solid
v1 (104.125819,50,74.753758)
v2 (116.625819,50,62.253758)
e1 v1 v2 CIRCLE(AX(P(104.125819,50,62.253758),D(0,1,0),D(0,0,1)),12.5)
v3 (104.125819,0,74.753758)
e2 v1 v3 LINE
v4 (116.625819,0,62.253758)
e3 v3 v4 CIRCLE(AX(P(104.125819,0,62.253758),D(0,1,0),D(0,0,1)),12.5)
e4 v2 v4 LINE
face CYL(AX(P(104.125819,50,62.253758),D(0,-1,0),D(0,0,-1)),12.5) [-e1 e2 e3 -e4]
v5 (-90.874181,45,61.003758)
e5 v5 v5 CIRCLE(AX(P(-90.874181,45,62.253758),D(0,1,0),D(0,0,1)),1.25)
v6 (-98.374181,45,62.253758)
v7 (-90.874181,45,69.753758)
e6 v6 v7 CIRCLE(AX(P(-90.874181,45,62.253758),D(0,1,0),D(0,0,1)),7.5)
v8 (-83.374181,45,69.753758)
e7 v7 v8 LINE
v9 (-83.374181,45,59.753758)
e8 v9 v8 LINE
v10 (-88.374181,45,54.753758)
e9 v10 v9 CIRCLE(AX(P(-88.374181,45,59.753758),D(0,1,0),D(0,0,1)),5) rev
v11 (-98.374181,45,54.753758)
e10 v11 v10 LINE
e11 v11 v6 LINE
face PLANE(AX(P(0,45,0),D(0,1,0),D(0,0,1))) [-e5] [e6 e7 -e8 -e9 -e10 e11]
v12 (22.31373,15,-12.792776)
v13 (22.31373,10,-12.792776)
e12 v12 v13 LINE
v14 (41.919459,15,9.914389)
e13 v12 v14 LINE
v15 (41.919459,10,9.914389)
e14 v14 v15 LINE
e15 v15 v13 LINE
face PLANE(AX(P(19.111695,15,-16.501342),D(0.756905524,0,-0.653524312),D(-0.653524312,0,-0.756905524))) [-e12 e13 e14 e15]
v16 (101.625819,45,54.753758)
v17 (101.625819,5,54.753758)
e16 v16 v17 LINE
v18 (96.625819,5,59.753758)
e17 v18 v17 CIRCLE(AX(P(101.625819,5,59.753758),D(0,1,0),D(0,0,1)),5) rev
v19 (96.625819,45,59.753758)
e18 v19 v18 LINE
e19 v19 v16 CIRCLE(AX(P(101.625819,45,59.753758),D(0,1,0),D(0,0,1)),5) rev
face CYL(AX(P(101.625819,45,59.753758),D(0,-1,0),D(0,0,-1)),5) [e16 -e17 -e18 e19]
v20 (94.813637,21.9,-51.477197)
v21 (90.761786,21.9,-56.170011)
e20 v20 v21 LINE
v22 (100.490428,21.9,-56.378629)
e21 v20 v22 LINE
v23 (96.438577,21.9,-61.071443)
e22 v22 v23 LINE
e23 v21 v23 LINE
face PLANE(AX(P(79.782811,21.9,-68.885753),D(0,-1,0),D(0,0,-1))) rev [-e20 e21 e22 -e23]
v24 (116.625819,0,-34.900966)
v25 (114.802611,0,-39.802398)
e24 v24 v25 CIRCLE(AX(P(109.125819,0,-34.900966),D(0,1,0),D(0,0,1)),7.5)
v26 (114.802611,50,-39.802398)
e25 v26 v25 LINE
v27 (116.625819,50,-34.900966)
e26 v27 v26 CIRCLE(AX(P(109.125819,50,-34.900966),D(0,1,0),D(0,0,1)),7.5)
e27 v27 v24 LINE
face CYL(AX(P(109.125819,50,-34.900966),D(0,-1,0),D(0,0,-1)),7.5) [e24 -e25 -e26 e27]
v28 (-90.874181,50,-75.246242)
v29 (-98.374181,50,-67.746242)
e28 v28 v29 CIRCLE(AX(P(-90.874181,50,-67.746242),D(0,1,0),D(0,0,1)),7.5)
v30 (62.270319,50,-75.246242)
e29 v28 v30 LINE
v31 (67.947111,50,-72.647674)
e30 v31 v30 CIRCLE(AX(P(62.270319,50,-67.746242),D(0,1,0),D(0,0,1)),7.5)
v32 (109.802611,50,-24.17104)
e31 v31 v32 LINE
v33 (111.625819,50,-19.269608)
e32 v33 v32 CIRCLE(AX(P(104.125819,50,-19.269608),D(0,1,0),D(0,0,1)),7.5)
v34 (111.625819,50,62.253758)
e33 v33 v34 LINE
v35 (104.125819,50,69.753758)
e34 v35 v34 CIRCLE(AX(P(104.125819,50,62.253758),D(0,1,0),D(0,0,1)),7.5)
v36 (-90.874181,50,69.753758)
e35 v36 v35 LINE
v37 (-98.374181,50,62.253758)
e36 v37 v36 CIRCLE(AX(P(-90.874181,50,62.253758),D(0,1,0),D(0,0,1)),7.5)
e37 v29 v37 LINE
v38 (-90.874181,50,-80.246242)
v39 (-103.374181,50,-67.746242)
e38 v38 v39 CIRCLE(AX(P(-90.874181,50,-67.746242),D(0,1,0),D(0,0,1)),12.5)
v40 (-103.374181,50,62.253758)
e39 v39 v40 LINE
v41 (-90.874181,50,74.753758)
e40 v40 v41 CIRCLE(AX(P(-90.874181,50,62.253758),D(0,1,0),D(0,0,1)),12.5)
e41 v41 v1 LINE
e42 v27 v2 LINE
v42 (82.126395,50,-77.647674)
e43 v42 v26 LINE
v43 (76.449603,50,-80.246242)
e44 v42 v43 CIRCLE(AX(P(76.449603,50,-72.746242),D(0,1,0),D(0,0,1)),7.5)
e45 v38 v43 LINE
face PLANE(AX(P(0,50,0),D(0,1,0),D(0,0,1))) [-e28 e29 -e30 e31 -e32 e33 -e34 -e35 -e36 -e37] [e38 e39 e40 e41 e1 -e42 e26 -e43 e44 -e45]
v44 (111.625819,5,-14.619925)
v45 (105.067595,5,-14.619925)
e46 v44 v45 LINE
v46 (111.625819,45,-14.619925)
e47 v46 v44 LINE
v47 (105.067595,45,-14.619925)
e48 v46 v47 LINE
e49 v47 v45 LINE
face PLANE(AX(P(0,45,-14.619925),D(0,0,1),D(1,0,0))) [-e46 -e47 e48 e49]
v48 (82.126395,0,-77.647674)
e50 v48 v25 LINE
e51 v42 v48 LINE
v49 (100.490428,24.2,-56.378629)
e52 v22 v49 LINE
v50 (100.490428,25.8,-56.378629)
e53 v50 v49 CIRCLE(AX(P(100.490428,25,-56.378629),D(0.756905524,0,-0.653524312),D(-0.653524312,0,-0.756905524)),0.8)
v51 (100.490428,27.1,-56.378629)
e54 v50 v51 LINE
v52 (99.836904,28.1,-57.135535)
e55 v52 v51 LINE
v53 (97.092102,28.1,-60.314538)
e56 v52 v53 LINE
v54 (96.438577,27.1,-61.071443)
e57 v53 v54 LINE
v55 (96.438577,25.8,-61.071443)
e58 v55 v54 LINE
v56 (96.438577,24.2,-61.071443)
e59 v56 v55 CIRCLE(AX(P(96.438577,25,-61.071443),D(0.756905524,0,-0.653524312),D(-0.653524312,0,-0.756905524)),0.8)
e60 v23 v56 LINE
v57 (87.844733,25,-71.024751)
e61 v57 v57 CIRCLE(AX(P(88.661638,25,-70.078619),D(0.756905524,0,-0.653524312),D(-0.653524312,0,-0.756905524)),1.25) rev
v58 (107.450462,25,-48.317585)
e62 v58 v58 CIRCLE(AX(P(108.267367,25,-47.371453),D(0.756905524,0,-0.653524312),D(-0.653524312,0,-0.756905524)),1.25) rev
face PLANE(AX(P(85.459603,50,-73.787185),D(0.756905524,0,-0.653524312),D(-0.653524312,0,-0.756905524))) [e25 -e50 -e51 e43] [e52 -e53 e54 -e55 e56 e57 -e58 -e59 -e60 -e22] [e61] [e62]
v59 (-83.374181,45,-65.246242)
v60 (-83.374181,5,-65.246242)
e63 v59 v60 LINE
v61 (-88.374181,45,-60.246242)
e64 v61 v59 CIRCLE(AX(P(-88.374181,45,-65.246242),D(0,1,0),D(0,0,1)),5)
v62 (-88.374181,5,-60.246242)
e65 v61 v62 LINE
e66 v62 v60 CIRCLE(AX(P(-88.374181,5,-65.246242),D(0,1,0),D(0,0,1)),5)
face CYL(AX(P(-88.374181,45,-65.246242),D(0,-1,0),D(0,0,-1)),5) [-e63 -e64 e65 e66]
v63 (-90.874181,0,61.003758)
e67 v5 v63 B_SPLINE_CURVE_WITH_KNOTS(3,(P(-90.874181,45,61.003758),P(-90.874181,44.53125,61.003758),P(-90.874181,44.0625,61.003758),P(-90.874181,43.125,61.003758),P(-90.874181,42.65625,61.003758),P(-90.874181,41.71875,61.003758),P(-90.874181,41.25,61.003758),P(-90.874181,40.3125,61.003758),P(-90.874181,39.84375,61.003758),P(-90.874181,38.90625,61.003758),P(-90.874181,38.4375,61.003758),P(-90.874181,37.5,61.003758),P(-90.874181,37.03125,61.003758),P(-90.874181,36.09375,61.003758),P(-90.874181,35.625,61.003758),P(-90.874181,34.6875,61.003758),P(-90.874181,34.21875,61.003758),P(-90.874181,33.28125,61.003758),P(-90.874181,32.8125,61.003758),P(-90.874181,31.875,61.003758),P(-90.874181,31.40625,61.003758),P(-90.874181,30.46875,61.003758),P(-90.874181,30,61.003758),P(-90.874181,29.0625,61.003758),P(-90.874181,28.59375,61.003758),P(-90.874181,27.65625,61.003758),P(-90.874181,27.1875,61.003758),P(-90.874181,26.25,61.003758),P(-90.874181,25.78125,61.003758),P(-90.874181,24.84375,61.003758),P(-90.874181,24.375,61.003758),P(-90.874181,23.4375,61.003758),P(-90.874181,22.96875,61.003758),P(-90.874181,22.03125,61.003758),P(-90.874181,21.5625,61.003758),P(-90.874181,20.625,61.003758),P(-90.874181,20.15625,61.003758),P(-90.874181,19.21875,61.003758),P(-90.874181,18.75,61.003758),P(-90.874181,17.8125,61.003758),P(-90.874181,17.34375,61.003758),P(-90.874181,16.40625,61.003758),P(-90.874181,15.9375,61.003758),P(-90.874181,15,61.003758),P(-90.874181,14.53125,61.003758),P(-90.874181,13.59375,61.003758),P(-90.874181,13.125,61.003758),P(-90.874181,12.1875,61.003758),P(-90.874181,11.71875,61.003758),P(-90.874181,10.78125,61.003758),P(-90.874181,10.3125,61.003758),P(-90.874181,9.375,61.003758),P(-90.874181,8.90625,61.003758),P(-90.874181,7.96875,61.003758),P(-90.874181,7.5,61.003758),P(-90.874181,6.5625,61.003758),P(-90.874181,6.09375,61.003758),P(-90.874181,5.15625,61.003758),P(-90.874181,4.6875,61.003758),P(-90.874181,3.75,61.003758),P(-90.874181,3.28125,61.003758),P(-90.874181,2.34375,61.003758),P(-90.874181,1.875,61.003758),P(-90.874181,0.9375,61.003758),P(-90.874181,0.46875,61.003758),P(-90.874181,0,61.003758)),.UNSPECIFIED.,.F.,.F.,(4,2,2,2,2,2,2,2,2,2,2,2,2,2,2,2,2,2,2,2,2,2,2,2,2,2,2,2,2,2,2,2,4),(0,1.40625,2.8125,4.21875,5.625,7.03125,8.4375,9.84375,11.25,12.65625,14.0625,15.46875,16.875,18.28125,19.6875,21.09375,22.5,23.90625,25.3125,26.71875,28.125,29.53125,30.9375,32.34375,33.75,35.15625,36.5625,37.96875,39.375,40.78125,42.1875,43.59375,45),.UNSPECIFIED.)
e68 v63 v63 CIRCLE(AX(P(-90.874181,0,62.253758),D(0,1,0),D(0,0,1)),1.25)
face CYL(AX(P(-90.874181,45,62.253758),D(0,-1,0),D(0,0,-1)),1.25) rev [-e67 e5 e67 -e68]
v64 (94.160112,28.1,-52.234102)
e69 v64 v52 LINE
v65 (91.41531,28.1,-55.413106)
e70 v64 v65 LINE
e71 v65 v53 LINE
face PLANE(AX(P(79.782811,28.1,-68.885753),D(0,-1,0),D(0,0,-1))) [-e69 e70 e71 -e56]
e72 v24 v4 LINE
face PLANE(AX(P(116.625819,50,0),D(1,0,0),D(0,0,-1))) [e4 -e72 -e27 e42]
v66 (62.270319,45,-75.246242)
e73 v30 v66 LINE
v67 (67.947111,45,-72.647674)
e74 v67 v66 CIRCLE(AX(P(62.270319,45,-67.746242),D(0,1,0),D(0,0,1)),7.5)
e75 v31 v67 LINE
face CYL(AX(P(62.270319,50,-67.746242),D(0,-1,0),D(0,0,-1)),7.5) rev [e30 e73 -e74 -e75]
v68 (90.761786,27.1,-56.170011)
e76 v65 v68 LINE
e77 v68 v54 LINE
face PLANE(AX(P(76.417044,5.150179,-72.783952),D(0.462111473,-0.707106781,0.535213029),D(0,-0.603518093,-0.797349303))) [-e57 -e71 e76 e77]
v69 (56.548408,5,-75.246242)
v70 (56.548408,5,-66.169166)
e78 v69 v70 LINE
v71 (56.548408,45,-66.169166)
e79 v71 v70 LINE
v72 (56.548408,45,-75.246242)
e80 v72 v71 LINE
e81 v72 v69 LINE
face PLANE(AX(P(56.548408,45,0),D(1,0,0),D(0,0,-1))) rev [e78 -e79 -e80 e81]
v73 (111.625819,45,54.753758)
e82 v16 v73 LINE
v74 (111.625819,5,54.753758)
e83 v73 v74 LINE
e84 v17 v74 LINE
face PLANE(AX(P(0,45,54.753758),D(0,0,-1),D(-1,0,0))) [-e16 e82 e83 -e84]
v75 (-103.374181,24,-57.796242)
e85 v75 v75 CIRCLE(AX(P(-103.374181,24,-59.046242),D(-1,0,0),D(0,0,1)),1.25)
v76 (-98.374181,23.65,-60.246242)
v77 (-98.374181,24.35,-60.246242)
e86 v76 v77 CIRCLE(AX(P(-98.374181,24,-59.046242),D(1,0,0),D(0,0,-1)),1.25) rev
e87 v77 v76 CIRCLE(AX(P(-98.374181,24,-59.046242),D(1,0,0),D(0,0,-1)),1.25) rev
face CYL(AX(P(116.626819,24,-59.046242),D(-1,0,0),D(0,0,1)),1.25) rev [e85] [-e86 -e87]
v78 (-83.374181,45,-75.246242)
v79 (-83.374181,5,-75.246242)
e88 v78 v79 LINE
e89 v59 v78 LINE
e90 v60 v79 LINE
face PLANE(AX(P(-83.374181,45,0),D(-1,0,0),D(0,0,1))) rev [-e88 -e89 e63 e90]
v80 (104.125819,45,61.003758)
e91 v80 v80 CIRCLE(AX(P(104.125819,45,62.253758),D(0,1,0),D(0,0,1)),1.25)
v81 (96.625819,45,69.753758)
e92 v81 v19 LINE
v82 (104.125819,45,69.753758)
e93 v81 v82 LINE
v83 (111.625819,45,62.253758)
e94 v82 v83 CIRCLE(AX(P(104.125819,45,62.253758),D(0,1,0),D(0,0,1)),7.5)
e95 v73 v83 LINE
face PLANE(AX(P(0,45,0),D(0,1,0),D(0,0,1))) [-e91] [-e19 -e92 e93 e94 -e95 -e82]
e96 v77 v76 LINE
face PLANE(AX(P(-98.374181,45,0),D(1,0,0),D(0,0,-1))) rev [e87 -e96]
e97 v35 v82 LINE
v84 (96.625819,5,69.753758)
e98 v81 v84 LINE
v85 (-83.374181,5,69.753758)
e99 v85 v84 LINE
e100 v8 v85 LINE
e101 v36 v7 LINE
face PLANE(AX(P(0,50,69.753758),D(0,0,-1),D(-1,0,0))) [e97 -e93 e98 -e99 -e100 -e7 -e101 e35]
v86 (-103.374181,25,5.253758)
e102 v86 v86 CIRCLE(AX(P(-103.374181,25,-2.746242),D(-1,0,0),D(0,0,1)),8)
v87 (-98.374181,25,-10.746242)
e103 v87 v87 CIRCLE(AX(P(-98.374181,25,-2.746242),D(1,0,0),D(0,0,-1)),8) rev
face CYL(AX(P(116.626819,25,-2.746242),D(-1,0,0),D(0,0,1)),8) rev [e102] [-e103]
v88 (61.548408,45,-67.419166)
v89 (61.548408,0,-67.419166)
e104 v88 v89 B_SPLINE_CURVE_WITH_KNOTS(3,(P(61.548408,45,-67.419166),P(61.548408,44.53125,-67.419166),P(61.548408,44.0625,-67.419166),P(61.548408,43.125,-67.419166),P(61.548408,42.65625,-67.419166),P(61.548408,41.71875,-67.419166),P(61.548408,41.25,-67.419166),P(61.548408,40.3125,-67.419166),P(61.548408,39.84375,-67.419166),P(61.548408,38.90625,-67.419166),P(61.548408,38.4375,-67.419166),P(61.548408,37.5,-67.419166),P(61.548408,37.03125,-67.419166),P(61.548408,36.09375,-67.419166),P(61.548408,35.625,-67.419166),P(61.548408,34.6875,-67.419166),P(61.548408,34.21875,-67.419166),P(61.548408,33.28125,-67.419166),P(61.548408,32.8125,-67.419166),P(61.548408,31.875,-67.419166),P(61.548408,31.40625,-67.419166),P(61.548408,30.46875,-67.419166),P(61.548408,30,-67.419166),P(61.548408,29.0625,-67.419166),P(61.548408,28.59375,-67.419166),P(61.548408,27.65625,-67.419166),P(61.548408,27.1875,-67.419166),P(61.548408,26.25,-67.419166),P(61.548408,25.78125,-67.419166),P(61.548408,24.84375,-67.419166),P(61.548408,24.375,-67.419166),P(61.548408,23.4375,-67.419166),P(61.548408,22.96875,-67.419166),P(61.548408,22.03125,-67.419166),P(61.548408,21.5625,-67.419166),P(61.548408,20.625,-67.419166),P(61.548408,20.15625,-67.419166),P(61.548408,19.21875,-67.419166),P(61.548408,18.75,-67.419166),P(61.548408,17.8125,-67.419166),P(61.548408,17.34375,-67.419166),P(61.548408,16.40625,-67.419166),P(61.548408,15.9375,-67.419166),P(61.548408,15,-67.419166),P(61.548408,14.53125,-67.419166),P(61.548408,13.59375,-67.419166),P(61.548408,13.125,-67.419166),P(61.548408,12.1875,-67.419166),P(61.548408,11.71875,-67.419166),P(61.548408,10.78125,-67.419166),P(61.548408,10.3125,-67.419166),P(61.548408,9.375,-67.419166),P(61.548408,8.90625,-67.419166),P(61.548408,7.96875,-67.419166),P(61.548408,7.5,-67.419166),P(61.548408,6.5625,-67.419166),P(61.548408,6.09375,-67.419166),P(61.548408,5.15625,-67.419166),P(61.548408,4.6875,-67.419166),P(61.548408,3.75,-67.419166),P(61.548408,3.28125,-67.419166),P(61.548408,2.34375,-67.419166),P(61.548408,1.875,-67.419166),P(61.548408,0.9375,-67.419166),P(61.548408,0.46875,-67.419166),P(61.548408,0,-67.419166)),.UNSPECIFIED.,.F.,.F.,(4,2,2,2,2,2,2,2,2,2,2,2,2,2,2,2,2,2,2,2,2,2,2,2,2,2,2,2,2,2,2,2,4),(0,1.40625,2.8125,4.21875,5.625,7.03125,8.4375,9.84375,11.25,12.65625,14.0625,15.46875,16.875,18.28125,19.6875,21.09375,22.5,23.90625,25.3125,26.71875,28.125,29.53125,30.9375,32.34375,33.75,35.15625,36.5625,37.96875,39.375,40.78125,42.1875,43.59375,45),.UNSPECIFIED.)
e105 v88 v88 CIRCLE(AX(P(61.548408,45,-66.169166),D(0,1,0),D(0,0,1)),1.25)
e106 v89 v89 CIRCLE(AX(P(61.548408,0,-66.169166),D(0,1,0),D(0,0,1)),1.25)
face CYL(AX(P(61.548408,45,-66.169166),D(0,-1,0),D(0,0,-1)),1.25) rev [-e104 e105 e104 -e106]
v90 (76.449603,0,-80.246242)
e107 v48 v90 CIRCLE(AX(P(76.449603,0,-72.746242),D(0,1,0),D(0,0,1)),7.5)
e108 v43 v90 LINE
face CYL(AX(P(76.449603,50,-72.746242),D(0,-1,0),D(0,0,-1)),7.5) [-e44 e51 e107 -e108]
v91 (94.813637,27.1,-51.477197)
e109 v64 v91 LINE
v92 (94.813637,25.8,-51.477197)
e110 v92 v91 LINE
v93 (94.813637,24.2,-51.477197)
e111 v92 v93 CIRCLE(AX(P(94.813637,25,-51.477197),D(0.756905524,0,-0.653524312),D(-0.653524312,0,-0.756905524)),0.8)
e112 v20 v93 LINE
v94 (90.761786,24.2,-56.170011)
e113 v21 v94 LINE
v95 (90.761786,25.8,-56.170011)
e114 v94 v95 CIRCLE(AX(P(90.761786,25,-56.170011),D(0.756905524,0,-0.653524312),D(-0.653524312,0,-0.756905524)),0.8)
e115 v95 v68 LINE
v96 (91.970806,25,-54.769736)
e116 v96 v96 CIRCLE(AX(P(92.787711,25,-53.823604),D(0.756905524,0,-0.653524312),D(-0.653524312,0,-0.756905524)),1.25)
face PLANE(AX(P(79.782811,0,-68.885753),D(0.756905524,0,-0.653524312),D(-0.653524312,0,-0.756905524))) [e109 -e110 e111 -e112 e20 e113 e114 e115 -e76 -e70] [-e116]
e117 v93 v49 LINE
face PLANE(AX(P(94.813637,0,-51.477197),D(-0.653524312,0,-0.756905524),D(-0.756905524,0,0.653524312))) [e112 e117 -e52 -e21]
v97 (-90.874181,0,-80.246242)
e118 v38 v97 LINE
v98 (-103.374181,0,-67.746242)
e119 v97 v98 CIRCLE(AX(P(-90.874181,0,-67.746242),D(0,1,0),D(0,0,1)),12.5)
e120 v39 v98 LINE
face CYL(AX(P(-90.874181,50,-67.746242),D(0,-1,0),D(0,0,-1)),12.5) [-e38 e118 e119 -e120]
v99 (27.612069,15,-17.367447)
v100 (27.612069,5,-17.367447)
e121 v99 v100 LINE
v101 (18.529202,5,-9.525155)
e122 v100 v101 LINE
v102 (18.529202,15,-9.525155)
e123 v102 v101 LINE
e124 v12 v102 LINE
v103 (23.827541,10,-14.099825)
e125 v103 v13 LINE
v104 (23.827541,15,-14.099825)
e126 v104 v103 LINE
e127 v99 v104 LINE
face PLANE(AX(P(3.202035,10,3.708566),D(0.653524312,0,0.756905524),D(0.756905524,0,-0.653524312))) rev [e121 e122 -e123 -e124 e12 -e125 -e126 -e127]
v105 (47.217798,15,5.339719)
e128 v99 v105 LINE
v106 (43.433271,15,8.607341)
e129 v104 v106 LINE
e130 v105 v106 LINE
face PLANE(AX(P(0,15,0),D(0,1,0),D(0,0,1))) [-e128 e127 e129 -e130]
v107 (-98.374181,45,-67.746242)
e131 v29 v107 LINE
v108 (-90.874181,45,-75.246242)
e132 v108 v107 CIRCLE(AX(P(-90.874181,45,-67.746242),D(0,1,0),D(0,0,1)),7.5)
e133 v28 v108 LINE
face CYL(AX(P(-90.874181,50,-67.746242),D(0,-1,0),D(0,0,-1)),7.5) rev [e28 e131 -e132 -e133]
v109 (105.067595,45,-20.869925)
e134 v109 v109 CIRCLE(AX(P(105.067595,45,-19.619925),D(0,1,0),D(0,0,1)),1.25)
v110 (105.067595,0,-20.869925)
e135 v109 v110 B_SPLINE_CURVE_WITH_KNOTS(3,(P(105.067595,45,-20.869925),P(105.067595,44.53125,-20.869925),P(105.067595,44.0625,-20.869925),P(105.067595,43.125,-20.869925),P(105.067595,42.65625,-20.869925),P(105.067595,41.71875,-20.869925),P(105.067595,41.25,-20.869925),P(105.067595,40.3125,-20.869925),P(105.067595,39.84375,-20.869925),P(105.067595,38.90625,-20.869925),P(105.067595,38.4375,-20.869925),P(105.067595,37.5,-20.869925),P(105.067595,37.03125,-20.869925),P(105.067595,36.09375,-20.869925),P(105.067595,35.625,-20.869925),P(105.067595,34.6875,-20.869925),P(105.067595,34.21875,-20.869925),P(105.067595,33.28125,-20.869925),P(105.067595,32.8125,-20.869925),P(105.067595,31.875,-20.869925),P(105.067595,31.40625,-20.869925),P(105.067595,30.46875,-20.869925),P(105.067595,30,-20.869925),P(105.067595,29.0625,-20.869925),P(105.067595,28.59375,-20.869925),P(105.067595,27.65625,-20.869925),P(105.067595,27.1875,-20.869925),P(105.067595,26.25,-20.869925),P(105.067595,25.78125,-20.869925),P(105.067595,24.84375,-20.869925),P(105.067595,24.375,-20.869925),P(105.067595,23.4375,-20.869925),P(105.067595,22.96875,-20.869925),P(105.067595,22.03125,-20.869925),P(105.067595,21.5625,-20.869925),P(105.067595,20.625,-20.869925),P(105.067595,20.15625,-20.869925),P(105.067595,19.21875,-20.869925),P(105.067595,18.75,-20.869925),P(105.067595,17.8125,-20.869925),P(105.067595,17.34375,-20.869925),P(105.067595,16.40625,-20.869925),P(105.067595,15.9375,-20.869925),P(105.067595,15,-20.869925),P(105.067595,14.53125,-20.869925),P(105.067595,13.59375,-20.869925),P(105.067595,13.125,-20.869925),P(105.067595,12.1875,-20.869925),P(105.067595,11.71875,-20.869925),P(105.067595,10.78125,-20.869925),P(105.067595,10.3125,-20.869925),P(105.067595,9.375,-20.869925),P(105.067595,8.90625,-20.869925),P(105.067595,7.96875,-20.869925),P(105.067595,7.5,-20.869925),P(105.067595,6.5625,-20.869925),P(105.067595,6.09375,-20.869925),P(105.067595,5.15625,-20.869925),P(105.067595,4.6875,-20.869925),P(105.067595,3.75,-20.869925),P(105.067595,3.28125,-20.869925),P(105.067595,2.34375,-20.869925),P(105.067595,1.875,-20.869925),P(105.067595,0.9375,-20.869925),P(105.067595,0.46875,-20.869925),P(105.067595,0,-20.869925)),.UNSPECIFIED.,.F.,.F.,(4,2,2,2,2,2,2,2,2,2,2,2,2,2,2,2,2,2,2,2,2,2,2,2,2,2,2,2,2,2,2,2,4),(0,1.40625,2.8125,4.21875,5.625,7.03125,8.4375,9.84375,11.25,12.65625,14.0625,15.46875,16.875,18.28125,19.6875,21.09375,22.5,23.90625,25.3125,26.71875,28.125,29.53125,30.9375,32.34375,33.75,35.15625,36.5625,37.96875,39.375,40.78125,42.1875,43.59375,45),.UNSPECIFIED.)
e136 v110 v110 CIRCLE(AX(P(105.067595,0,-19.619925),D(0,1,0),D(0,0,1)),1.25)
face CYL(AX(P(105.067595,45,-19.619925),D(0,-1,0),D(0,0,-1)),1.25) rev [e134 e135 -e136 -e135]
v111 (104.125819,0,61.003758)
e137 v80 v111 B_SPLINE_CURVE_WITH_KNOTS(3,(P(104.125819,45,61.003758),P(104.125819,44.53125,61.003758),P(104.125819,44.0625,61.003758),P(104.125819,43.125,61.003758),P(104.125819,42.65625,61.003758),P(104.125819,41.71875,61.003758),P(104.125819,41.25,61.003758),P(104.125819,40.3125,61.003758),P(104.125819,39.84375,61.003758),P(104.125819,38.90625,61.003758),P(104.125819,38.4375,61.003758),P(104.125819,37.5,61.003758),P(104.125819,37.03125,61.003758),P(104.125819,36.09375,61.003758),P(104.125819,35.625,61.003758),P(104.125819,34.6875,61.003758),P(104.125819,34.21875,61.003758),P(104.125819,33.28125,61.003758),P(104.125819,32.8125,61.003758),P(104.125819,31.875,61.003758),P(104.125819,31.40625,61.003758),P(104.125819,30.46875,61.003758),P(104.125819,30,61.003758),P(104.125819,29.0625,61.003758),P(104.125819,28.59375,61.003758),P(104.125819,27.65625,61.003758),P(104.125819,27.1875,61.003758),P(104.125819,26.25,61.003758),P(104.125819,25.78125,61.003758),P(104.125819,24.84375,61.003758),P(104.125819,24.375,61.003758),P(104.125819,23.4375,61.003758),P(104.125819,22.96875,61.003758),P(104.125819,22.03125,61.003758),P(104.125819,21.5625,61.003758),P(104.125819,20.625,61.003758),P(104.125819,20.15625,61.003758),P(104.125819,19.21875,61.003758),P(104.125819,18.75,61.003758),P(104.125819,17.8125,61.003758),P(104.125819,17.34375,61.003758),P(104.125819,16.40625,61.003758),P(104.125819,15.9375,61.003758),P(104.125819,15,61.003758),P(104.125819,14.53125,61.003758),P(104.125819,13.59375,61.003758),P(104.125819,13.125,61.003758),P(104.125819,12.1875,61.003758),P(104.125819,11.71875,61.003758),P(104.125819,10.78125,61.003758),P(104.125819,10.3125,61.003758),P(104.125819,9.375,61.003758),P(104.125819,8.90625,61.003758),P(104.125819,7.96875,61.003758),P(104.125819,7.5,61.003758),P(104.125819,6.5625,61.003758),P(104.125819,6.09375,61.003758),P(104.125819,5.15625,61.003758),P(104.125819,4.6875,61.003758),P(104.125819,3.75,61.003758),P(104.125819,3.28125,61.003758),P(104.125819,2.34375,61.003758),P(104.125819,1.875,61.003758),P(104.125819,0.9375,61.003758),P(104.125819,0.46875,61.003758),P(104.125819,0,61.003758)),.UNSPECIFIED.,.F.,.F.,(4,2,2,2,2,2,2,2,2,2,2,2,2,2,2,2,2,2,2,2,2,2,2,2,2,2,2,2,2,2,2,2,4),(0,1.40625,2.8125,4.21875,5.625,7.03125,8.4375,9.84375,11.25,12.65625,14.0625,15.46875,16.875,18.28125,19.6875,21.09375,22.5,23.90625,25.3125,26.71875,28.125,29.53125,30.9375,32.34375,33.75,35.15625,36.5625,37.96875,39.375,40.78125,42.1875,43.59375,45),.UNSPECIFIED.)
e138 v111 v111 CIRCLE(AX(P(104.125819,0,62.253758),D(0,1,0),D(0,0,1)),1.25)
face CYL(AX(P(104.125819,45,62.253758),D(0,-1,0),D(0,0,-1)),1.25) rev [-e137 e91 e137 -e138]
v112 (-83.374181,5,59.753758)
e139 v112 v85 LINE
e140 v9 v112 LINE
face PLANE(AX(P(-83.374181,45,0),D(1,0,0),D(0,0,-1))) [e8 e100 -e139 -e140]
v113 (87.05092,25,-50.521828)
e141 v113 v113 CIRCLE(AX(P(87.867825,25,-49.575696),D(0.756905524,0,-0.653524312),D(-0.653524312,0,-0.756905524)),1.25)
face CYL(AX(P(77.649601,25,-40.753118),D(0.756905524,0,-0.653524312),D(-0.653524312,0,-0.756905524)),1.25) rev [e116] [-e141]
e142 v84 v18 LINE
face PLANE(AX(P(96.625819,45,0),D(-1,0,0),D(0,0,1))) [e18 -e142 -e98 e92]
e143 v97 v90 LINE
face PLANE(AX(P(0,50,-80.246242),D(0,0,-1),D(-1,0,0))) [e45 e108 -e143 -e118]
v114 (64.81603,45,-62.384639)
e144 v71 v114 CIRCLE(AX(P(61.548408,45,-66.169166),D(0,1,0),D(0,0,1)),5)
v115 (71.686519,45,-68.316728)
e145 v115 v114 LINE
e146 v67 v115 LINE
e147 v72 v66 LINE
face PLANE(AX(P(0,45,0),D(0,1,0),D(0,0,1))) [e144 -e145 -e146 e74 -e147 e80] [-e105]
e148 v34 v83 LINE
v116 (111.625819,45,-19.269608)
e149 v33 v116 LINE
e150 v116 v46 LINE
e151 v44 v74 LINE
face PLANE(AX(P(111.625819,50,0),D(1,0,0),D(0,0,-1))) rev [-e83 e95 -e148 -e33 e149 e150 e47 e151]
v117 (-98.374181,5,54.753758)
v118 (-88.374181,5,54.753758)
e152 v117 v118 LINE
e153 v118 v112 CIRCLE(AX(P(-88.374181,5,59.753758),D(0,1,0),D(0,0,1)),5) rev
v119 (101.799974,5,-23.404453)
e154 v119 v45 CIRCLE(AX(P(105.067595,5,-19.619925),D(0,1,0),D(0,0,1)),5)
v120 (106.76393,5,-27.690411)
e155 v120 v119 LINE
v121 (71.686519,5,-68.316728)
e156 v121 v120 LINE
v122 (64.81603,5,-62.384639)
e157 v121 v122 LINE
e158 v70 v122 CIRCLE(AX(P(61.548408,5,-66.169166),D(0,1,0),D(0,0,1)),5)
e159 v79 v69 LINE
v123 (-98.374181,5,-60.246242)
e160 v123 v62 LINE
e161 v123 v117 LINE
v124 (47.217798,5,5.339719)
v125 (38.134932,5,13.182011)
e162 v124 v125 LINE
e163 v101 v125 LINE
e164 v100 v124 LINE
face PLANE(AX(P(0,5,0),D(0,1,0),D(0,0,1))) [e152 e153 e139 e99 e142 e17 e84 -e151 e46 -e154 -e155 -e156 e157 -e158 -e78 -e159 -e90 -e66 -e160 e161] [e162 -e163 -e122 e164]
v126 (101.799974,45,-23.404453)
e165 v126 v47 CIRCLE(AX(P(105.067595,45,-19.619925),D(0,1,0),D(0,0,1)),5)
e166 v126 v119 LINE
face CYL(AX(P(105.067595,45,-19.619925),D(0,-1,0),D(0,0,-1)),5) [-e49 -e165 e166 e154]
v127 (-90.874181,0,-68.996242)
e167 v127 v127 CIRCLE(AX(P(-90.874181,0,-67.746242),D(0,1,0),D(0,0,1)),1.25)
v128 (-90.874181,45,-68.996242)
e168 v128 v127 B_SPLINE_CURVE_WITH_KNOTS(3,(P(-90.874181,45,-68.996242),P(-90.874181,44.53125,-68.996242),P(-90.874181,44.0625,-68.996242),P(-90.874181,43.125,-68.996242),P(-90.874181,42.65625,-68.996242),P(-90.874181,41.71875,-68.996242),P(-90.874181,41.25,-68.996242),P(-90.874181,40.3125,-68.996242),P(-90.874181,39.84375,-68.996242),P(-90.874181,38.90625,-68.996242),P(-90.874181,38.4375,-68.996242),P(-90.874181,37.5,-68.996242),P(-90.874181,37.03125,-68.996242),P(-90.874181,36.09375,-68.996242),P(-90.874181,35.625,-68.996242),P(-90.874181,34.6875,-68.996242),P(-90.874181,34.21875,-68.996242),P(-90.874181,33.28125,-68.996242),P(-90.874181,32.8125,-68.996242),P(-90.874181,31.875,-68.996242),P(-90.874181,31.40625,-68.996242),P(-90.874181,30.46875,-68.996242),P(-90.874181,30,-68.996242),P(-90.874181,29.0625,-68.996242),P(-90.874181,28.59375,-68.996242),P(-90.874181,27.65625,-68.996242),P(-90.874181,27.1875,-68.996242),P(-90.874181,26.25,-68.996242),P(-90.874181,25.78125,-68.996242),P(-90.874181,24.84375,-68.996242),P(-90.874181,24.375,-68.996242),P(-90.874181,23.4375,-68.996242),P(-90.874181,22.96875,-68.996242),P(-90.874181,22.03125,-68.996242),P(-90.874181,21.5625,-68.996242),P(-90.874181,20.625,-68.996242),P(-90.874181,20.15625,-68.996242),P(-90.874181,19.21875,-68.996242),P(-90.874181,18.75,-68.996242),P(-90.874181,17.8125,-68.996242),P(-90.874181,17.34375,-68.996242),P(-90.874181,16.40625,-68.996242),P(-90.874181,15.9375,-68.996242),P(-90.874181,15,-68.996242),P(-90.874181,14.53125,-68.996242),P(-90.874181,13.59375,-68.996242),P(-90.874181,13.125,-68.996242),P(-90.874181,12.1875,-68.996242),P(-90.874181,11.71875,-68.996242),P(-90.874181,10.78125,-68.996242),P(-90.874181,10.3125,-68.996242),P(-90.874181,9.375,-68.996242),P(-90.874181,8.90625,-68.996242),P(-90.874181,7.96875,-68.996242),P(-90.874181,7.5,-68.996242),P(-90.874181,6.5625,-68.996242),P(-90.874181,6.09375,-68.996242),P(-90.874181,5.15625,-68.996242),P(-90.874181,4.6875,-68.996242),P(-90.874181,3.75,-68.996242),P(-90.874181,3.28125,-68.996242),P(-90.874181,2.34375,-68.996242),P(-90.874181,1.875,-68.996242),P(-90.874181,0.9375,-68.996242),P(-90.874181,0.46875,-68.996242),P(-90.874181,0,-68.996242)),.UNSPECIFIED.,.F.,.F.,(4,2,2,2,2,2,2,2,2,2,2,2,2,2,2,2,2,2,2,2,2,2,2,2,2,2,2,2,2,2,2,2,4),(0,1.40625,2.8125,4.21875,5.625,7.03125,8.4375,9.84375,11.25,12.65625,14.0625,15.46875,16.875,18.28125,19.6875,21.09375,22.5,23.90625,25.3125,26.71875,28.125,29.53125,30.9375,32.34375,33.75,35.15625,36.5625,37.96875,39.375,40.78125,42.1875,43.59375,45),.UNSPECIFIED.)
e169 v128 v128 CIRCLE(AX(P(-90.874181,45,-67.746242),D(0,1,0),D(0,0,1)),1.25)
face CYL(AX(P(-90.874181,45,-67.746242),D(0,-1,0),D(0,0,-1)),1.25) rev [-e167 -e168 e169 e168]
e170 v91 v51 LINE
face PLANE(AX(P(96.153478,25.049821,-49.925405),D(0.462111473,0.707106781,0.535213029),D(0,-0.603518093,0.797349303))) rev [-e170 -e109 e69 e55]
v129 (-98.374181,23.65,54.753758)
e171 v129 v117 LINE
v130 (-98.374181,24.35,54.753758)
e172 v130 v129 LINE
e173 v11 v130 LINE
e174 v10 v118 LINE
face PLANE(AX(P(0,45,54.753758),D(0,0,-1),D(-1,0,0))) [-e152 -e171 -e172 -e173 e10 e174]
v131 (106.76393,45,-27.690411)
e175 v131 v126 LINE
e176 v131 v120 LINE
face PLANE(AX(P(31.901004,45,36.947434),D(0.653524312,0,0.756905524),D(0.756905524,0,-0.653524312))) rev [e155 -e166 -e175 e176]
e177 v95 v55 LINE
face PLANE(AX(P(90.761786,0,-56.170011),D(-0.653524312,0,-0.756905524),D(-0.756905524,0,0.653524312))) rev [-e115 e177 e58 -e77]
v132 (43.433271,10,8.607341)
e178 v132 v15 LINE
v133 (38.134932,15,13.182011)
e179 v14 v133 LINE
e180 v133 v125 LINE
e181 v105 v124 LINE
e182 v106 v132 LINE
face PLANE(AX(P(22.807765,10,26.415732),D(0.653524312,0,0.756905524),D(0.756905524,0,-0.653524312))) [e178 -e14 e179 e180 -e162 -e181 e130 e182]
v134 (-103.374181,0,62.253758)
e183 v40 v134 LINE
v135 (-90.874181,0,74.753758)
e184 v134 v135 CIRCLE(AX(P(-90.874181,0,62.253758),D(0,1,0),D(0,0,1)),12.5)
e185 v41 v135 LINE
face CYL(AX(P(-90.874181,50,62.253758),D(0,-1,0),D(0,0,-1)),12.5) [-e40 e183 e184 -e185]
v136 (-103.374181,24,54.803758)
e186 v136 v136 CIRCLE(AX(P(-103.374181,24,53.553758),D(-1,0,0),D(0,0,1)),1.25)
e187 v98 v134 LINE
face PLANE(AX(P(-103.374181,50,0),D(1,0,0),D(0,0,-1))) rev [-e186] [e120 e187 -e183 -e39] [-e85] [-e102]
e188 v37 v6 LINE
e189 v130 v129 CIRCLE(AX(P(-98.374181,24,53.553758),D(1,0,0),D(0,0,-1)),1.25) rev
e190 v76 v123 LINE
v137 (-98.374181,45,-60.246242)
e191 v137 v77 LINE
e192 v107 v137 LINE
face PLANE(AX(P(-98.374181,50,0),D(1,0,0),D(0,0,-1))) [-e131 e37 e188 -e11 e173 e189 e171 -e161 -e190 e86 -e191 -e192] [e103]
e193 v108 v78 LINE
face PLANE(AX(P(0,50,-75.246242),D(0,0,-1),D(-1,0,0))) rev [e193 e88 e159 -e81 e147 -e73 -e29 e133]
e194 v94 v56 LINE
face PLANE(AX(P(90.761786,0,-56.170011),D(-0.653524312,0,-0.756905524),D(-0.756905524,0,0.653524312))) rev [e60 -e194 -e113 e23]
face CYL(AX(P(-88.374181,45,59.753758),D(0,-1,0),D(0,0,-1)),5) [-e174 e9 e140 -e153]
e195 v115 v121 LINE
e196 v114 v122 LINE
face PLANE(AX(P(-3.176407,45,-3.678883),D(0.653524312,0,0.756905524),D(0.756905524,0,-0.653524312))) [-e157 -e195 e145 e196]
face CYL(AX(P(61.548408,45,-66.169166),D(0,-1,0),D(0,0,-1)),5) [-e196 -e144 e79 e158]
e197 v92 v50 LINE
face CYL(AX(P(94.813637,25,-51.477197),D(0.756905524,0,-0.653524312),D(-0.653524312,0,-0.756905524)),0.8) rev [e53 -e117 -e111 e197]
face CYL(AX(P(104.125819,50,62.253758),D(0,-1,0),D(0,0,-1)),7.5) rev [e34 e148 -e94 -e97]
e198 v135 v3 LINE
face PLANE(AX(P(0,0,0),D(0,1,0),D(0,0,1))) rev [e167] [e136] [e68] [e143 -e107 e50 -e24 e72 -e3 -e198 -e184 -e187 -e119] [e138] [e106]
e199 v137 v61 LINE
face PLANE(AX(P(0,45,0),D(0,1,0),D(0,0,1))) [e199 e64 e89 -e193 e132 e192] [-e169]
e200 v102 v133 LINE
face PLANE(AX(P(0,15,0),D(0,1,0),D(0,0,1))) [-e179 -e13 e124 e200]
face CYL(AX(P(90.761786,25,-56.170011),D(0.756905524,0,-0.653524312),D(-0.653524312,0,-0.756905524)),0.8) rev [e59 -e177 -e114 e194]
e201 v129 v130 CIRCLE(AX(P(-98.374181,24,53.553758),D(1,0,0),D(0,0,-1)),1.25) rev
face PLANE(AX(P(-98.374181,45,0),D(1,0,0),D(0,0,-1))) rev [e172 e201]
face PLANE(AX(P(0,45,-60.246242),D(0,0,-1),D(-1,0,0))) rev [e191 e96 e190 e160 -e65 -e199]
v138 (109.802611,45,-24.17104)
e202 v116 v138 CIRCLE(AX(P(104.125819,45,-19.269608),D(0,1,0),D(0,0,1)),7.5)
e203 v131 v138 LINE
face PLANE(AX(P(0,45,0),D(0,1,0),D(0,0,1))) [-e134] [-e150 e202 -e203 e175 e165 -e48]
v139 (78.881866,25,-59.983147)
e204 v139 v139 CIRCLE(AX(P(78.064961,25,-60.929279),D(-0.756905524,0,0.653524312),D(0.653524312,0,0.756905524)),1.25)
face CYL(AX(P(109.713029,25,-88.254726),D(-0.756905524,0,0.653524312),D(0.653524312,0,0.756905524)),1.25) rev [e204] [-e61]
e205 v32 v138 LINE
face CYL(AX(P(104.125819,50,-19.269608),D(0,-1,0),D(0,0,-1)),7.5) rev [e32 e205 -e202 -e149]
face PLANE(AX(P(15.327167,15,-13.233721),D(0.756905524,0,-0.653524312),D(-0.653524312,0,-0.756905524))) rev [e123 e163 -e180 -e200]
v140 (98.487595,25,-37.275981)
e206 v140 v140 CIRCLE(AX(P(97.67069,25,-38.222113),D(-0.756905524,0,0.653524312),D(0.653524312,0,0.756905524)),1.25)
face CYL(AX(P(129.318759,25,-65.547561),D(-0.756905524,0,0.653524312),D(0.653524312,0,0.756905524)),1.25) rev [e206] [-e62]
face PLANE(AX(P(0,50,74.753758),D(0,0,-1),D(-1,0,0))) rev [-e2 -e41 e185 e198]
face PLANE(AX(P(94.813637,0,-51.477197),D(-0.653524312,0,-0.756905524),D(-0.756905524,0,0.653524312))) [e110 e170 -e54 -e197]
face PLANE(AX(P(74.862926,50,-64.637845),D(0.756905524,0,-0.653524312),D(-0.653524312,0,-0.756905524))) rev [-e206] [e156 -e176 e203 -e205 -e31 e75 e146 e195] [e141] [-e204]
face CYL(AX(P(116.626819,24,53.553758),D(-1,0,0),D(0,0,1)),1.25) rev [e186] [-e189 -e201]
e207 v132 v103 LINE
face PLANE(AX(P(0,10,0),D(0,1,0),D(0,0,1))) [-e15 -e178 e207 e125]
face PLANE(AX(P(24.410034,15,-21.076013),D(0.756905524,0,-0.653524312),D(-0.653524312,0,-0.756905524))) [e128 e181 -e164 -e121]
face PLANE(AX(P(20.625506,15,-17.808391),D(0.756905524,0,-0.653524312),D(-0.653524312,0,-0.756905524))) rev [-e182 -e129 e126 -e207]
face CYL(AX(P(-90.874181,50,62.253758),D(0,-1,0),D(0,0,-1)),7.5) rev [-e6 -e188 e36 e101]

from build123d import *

# Parameters (mm, degrees)
EXTRUDE_2_DEPTH     = 5
EXTRUDE_2_2_DEPTH   = 5
EXTRUDE_3_DEPTH     = 50
EXTRUDE_4_DEPTH     = 10
CUT_EXTRUDE_1_DEPTH = 7.5
SKETCH_9_R          = 1.25
CUT_EXTRUDE_3_DEPTH = 20
SKETCH_10_R         = 8
SKETCH_10_R_2       = 1.25
CUT_EXTRUDE_7_DEPTH = 5
SKETCH_1_9_R        = 1.25
EXTRUDE_5_DEPTH     = 45
SKETCH_14_R         = 1.25
CUT_EXTRUDE_8_DEPTH = 14
EXTRUDE_6_DEPTH     = 15


# Read off the part's stored shape, not the designer's step: 凸台-拉伸4
with BuildPart() as part:
    # 草图1 → 凸台-拉伸2 (new body)
    with BuildSketch(Plane(origin=(0, 0, 0), x_dir=(1, 0, 0), z_dir=(0, 1, 0))):
        with BuildLine():
            Line((56.548408352, 75.246242124), (-83.374180902, 75.246242124))
            Line((-83.374180902, 75.246242124), (-83.374180902, 65.246242124))
            ThreePointArc((-83.374180902, 65.246242124), (-84.838646996, 61.710708218), (-88.374180902, 60.246242124))
            Line((-88.374180902, 60.246242124), (-98.374180902, 60.246242124))
            Line((-98.374180902, 60.246242124), (-98.374180902, -54.753757876))
            Line((-98.374180902, -54.753757876), (-88.374180902, -54.753757876))
            ThreePointArc((-88.374180902, -54.753757876), (-84.838646996, -56.21822397), (-83.374180902, -59.753757876))
            Line((-83.374180902, -59.753757876), (-83.374180902, -69.753757876))
            Line((-83.374180902, -69.753757876), (96.625819098, -69.753757876))
            Line((96.625819098, -69.753757876), (96.625819098, -59.753757876))
            ThreePointArc((96.625819098, -59.753757876), (98.090285193, -56.21822397), (101.625819098, -54.753757876))
            Line((101.625819098, -54.753757876), (111.625819098, -54.753757876))
            Line((111.625819098, -54.753757876), (111.625819098, 14.619924984))
            Line((111.625819098, 14.619924984), (105.067595409, 14.619924984))
            ThreePointArc((105.067595409, 14.619924984), (100.381304866, 17.876743713), (101.799973847, 23.404452606))
            Line((101.799973847, 23.404452606), (106.763929588, 27.690411234))
            Line((106.763929588, 27.690411234), (71.686518841, 68.316728374))
            Line((71.686518841, 68.316728374), (64.816029914, 62.384638559))
            ThreePointArc((64.816029914, 62.384638559), (59.467315828, 61.622843062), (56.548408352, 66.169166182))
            Line((56.548408352, 66.169166182), (56.548408352, 75.246242124))
        make_face()
        Polygon((18.529202454, 9.525154804), (27.612068748, 17.367446554), (47.217798123, -5.33971918), (38.134931829, -13.18201093), align=None, mode=Mode.SUBTRACT)
    extrude(amount=EXTRUDE_2_DEPTH)

    # 草图1<6> → 凸台-拉伸3 (add)
    with BuildSketch(Plane(origin=(0, 0, 0), x_dir=(1, 0, 0), z_dir=(0, 1, 0))):
        with BuildLine():
            Line((116.625819098, 34.900965901), (116.625819098, -62.253757876))
            ThreePointArc((116.625819098, -62.253757876), (112.964653863, -71.092592641), (104.125819098, -74.753757876))
            Line((104.125819098, -74.753757876), (-90.874180902, -74.753757876))
            ThreePointArc((-90.874180902, -74.753757876), (-99.713015666, -71.092592641), (-103.374180902, -62.253757876))
            Line((-103.374180902, -62.253757876), (-103.374180902, 67.746242124))
            ThreePointArc((-103.374180902, 67.746242124), (-99.713015666, 76.585076889), (-90.874180902, 80.246242124))
            Line((-90.874180902, 80.246242124), (76.449603474, 80.246242124))
            ThreePointArc((76.449603474, 80.246242124), (79.57124226, 79.565726803), (82.126394907, 77.647674468))
            Line((82.126394907, 77.647674468), (114.802610532, 39.802398244))
            ThreePointArc((114.802610532, 39.802398244), (116.155254913, 37.515737807), (116.625819098, 34.900965901))
        make_face()
        with BuildLine():
            ThreePointArc((111.625819098, 19.269608073), (111.155254913, 21.88437998), (109.802610532, 24.171040417))
            Line((109.802610532, 24.171040417), (67.947110848, 72.647674468))
            ThreePointArc((67.947110848, 72.647674468), (65.3919582, 74.565726803), (62.270319414, 75.246242124))
            Line((62.270319414, 75.246242124), (-90.874180902, 75.246242124))
            ThreePointArc((-90.874180902, 75.246242124), (-96.17748176, 73.049542983), (-98.374180902, 67.746242124))
            Line((-98.374180902, 67.746242124), (-98.374180902, -62.253757876))
            ThreePointArc((-98.374180902, -62.253757876), (-96.17748176, -67.557058735), (-90.874180902, -69.753757876))
            Line((-90.874180902, -69.753757876), (104.125819098, -69.753757876))
            ThreePointArc((104.125819098, -69.753757876), (109.429119957, -67.557058735), (111.625819098, -62.253757876))
            Line((111.625819098, -62.253757876), (111.625819098, 19.269608073))
        make_face(mode=Mode.SUBTRACT)
    extrude(amount=EXTRUDE_3_DEPTH)

    # 凸台-拉伸4 outline → 凸台-拉伸4 (add)
    with BuildSketch(Plane(origin=(0, 0, 0), x_dir=(1, 0, 0), z_dir=(0, 1, 0))):
        Polygon((43.4332705, -8.607340743), (23.827541125, 14.099824991), (22.313730076, 12.792776366), (41.919459451, -9.914389368), align=None)
    extrude(amount=EXTRUDE_4_DEPTH)

    # 草图6 → 切除-拉伸1 (cut)
    with BuildSketch(Plane(origin=(85.459602861, 0, -73.787185323), x_dir=(-0.6535243124977221, 0, -0.7569055244707755), z_dir=(0.7569055244707754, 0, -0.653524312497722))):
        with BuildLine():
            Line((-22.999642003, 24.2), (-22.999642003, 21.9))
            Line((-22.999642003, 21.9), (-16.799642003, 21.9))
            Line((-16.799642003, 21.9), (-16.799642003, 24.2))
            ThreePointArc((-16.799642003, 24.2), (-15.999642003, 25), (-16.799642003, 25.8))
            Line((-16.799642003, 25.8), (-16.799642003, 27.1))
            Line((-16.799642003, 27.1), (-17.799642003, 28.1))
            Line((-17.799642003, 28.1), (-21.999642003, 28.1))
            Line((-21.999642003, 28.1), (-22.999642003, 27.1))
            Line((-22.999642003, 27.1), (-22.999642003, 25.8))
            ThreePointArc((-22.999642003, 25.8), (-23.799642003, 25), (-22.999642003, 24.2))
        make_face()
    extrude(amount=-CUT_EXTRUDE_1_DEPTH, mode=Mode.SUBTRACT)

    # 草图9 → 切除-拉伸3 (cut)
    with BuildSketch(Plane(origin=(79.782811427, 0, -68.885752979), x_dir=(-0.6535243124977224, 0, -0.7569055244707754), z_dir=(0.7569055244707754, 0, -0.6535243124977224))):
        with Locations((-19.899642003, 25)):
            Circle(SKETCH_9_R)
    extrude(amount=-CUT_EXTRUDE_3_DEPTH, mode=Mode.SUBTRACT)

    # 草图10 → 切除-拉伸7 (cut)
    with BuildSketch(Plane.ZY.offset(103.374180902)):
        with Locations((-2.746242124, 25)):
            Circle(SKETCH_10_R)
        with Locations((-59.046242124, 24)):
            Circle(SKETCH_10_R_2)
        with Locations((53.553757876, 24)):
            Circle(SKETCH_10_R_2)
    extrude(amount=-CUT_EXTRUDE_7_DEPTH, mode=Mode.SUBTRACT)

    # 草图1<9> → 凸台-拉伸5 (add)
    # profile 1 of 5: a face of its own
    with BuildSketch(Plane(origin=(0, 0, 0), x_dir=(1, 0, 0), z_dir=(0, 1, 0))):
        with BuildLine():
            Line((-83.374180902, 75.246242124), (-90.874180902, 75.246242124))
            ThreePointArc((-90.874180902, 75.246242124), (-96.17748176, 73.049542983), (-98.374180902, 67.746242124))
            Line((-98.374180902, 67.746242124), (-98.374180902, 60.246242124))
            Line((-98.374180902, 60.246242124), (-88.374180902, 60.246242124))
            ThreePointArc((-88.374180902, 60.246242124), (-84.838646996, 61.710708218), (-83.374180902, 65.246242124))
            Line((-83.374180902, 65.246242124), (-83.374180902, 75.246242124))
        make_face()
        with Locations(Location((-90.874180902, 67.746242124, 0), (0, 0, 90))):
            Circle(SKETCH_1_9_R, mode=Mode.SUBTRACT)
    # profile 2 of 5: a face of its own
    with BuildSketch(Plane(origin=(0, 0, 0), x_dir=(1, 0, 0), z_dir=(0, 1, 0))):
        with BuildLine():
            Line((-88.374180902, -54.753757876), (-98.374180902, -54.753757876))
            Line((-98.374180902, -54.753757876), (-98.374180902, -62.253757876))
            ThreePointArc((-98.374180902, -62.253757876), (-96.17748176, -67.557058735), (-90.874180902, -69.753757876))
            Line((-90.874180902, -69.753757876), (-83.374180902, -69.753757876))
            Line((-83.374180902, -69.753757876), (-83.374180902, -59.753757876))
            ThreePointArc((-83.374180902, -59.753757876), (-84.838646996, -56.21822397), (-88.374180902, -54.753757876))
        make_face()
        with Locations(Location((-90.874180902, -62.253757876, 0), (0, 0, 90))):
            Circle(SKETCH_1_9_R, mode=Mode.SUBTRACT)
    # profile 3 of 5: a face of its own
    with BuildSketch(Plane(origin=(0, 0, 0), x_dir=(1, 0, 0), z_dir=(0, 1, 0))):
        with BuildLine():
            Line((96.625819098, -59.753757876), (96.625819098, -69.753757876))
            Line((96.625819098, -69.753757876), (104.125819098, -69.753757876))
            ThreePointArc((104.125819098, -69.753757876), (109.429119957, -67.557058735), (111.625819098, -62.253757876))
            Line((111.625819098, -62.253757876), (111.625819098, -54.753757876))
            Line((111.625819098, -54.753757876), (101.625819098, -54.753757876))
            ThreePointArc((101.625819098, -54.753757876), (98.090285193, -56.21822397), (96.625819098, -59.753757876))
        make_face()
        with Locations(Location((104.125819098, -62.253757876, 0), (0, 0, 90))):
            Circle(SKETCH_1_9_R, mode=Mode.SUBTRACT)
    # profile 4 of 5: a face of its own
    with BuildSketch(Plane(origin=(0, 0, 0), x_dir=(1, 0, 0), z_dir=(0, 1, 0))):
        with BuildLine():
            Line((109.802610532, 24.171040417), (106.763929588, 27.690411234))
            Line((106.763929588, 27.690411234), (101.799973847, 23.404452606))
            ThreePointArc((101.799973847, 23.404452606), (100.381304866, 17.876743713), (105.067595409, 14.619924984))
            Line((105.067595409, 14.619924984), (111.625819098, 14.619924984))
            Line((111.625819098, 14.619924984), (111.625819098, 19.269608073))
            ThreePointArc((111.625819098, 19.269608073), (111.155254913, 21.88437998), (109.802610532, 24.171040417))
        make_face()
        with Locations(Location((105.067595409, 19.619924984, 0), (0, 0, 90))):
            Circle(SKETCH_1_9_R, mode=Mode.SUBTRACT)
    # profile 5 of 5: a face of its own
    with BuildSketch(Plane(origin=(0, 0, 0), x_dir=(1, 0, 0), z_dir=(0, 1, 0))):
        with BuildLine():
            Line((62.270319414, 75.246242124), (56.548408352, 75.246242124))
            Line((56.548408352, 75.246242124), (56.548408352, 66.169166182))
            ThreePointArc((56.548408352, 66.169166182), (59.467315828, 61.622843062), (64.816029914, 62.384638559))
            Line((64.816029914, 62.384638559), (71.686518841, 68.316728374))
            Line((71.686518841, 68.316728374), (67.947110848, 72.647674468))
            ThreePointArc((67.947110848, 72.647674468), (65.3919582, 74.565726803), (62.270319414, 75.246242124))
        make_face()
        with Locations(Location((61.548408352, 66.169166182, 0), (0, 0, 90))):
            Circle(SKETCH_1_9_R, mode=Mode.SUBTRACT)
    extrude(amount=EXTRUDE_5_DEPTH)

    # 草图14 → 切除-拉伸8 (cut)
    with BuildSketch(Plane(origin=(74.862925518, 0, -64.637844948), x_dir=(0.6535243124977226, 0, 0.7569055244707751), z_dir=(-0.7569055244707751, 0, 0.6535243124977226))):
        with Locations((34.899642003, 25)):
            Circle(SKETCH_14_R)
        with Locations((4.899642003, 25)):
            Circle(SKETCH_14_R)
    extrude(amount=-CUT_EXTRUDE_8_DEPTH, mode=Mode.SUBTRACT)



with BuildPart() as body_2:
    # 草图1 → Extrude 2 2 (new body)
    with BuildSketch(Plane(origin=(0, 0, 0), x_dir=(1, 0, 0), z_dir=(0, 1, 0))):
        Polygon((40.165648938, -4.822813121), (27.095162688, 10.315297369), (25.581351639, 9.008248744), (38.651837889, -6.129861746), align=None)
    extrude(amount=EXTRUDE_2_2_DEPTH)


with BuildPart() as part_1:
    add(part.part)

    add(body_2.part)  # 凸台-拉伸6 merges body 2
    # 草图1<10> → 凸台-拉伸6 (add)
    with BuildSketch(Plane(origin=(0, 0, 0), x_dir=(1, 0, 0), z_dir=(0, 1, 0))):
        Polygon((23.827541125, 14.099824991), (27.095162688, 10.315297369), (40.165648938, -4.822813121), (43.4332705, -8.607340743), (47.217798123, -5.33971918), (27.612068748, 17.367446554), align=None)
        Polygon((38.651837889, -6.129861746), (25.581351639, 9.008248744), (22.313730076, 12.792776366), (18.529202454, 9.525154804), (38.134931829, -13.18201093), (41.919459451, -9.914389368), align=None)
    extrude(amount=EXTRUDE_6_DEPTH)


solid = part_1.part
